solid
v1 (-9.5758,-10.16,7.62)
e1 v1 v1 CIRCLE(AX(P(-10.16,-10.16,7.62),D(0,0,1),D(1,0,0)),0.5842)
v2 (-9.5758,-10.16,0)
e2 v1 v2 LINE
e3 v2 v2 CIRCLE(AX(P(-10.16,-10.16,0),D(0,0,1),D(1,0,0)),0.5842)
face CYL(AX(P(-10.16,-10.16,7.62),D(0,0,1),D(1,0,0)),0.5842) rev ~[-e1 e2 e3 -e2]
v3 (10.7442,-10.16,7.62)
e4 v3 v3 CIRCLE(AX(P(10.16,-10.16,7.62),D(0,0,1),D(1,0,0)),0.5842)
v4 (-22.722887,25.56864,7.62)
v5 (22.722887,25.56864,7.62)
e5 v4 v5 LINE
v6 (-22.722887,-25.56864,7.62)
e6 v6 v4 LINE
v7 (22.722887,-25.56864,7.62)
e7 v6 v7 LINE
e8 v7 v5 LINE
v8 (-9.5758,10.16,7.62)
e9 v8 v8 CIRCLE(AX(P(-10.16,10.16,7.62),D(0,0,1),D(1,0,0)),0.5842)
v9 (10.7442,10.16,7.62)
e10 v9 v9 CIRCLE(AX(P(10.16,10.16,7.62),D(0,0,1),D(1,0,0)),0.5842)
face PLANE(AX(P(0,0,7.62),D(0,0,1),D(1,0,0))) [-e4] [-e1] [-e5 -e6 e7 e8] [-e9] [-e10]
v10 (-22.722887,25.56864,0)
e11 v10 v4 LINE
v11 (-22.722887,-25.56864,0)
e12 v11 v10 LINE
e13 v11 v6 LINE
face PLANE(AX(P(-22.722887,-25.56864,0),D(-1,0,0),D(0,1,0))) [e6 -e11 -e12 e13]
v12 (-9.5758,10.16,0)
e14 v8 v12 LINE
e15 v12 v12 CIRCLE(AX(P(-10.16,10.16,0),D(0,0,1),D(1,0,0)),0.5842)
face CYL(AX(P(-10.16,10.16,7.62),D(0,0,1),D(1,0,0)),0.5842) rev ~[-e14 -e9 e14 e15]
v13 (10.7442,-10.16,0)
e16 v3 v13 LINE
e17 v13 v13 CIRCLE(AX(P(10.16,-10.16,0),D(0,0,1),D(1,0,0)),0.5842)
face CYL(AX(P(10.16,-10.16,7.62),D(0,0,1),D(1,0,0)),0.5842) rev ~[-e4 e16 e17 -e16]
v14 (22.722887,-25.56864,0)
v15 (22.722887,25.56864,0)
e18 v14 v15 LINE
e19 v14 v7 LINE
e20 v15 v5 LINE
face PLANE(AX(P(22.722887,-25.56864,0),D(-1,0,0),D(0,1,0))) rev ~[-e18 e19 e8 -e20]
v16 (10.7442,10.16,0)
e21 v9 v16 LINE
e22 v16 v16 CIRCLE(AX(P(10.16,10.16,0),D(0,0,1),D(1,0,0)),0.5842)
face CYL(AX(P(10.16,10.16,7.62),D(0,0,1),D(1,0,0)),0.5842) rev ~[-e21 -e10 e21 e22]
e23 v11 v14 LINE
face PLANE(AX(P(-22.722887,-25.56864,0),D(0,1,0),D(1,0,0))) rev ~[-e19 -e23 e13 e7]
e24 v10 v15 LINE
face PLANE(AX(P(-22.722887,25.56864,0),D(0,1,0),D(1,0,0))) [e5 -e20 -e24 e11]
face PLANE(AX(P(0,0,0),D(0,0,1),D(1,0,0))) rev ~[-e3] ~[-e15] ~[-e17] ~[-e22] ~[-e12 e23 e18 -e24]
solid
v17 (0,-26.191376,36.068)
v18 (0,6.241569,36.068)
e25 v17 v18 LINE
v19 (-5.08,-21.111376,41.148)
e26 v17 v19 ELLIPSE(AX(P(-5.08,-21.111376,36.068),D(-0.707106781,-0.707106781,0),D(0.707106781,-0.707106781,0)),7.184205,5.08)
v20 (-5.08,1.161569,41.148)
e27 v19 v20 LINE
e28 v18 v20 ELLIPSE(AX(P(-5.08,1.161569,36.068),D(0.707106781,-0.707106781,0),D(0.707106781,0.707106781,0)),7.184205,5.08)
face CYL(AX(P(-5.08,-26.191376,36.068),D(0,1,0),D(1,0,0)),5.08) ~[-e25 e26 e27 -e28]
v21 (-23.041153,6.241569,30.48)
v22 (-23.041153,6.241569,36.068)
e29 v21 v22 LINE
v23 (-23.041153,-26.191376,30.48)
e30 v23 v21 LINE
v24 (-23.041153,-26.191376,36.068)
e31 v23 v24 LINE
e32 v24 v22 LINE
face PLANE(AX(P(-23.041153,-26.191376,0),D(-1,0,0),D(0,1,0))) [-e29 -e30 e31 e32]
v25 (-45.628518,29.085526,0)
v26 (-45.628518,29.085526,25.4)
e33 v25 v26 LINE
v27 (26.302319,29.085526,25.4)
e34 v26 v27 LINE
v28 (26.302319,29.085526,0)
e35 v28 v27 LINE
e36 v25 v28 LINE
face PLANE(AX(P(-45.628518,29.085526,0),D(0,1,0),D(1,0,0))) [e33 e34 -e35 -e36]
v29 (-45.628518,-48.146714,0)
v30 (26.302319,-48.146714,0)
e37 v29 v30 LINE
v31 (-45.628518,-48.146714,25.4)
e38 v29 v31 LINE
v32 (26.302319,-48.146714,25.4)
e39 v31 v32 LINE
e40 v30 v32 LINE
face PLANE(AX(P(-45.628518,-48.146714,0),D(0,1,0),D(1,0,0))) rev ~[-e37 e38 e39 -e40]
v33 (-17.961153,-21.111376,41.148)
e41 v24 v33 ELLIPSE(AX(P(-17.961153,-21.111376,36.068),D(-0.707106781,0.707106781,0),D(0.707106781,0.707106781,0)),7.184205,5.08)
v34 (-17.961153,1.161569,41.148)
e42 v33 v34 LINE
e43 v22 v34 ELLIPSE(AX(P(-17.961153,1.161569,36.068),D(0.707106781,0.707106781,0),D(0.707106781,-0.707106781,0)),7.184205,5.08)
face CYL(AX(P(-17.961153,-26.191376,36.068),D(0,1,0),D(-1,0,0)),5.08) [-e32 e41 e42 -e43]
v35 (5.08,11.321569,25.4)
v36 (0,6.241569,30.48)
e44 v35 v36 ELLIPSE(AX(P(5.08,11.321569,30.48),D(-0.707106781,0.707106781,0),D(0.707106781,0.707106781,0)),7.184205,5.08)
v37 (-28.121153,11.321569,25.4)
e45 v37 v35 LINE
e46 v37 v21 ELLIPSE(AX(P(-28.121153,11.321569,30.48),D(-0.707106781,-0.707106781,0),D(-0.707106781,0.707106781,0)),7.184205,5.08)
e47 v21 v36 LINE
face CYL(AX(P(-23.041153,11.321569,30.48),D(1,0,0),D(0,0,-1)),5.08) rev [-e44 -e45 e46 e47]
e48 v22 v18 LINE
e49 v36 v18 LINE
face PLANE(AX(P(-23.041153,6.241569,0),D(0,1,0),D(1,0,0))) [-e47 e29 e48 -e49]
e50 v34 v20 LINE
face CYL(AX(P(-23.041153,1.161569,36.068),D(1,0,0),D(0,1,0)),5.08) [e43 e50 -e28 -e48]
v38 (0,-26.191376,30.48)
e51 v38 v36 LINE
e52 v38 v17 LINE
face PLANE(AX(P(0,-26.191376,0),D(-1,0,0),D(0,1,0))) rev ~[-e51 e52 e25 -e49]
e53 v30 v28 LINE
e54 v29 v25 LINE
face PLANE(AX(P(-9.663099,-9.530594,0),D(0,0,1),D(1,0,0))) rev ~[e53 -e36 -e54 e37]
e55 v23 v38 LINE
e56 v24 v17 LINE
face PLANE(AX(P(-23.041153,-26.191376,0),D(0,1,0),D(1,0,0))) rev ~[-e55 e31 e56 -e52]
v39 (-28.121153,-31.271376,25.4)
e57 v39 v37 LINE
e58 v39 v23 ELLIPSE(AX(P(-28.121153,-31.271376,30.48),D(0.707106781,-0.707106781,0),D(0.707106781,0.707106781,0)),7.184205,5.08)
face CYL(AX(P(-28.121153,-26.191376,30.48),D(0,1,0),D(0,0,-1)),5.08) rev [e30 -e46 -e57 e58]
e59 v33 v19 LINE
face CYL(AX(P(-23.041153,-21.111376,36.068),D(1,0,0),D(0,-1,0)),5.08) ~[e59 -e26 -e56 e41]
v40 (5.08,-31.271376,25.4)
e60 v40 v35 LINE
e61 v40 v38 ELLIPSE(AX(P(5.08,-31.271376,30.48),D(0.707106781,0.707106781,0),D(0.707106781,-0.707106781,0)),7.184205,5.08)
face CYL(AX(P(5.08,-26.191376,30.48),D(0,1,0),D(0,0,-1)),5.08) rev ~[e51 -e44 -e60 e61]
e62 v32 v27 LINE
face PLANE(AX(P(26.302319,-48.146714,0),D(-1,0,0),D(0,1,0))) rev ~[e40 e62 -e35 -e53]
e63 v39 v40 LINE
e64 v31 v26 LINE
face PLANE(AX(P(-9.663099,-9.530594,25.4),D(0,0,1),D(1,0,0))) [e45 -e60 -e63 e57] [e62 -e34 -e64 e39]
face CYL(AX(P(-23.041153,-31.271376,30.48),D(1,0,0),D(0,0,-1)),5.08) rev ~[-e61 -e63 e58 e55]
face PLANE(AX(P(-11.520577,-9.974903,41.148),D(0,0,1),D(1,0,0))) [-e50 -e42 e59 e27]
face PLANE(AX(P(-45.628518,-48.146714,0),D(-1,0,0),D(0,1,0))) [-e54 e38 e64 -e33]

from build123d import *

# Parameters (mm, degrees)
F0_W     = 23.0411533266
F0_H     = 32.4329454452
F1_DEPTH = 41.148
F2_W     = 71.9308368862
F2_H     = 77.2322397679
F3_DEPTH = 25.4
F4_R     = 5.08
F5_W     = 45.4457737505
F5_H     = 51.1372797191
F6_DEPTH = 7.62
F7_R     = 0.5842
F8_DEPTH = 7.62


with BuildPart() as f1:
    # F0 (on Top) → F1 (new body)
    with BuildSketch(Plane.XY):
        with Locations((-11.5205766633, -9.9749034271)):
            Rectangle(F0_W, F0_H)
    extrude(amount=F1_DEPTH)

    # F2 (on Top) → F3 (join)
    with BuildSketch(Plane.XY):
        with Locations((-9.6630994231, -9.5305936411)):
            Rectangle(F2_W, F2_H)
    extrude(amount=F3_DEPTH)

    # F4
    f4_edges = [f1.edges().sort_by_distance(p)[0] for p in [
        (-23.041153, -9.974903, 25.4),
        (-11.520577, -26.191376, 25.4),
        (0, -9.974903, 25.4),
        (-11.520577, 6.241569, 25.4),
        (-11.520577, 6.241569, 41.148),
        (-23.041153, -9.974903, 41.148),
        (-11.520577, -26.191376, 41.148),
        (0, -9.974903, 41.148),
    ]]
    fillet(f4_edges, radius=F4_R)


with BuildPart() as f6:
    # F5 (on Top) → F6 (new body)
    with BuildSketch(Plane.XY):
        Rectangle(F5_W, F5_H)
    extrude(amount=F6_DEPTH)

    # F7 (on face) → F8 (cut, through all)
    with BuildSketch(Plane.XY.offset(7.62)):
        with Locations((10.16, -10.16)):
            Circle(F7_R)
        with Locations((10.16, 10.16)):
            Circle(F7_R)
        with Locations((-10.16, 10.16)):
            Circle(F7_R)
        with Locations((-10.16, -10.16)):
            Circle(F7_R)
    extrude(amount=-F8_DEPTH, mode=Mode.SUBTRACT)


solid = Compound([f1.part, f6.part])
